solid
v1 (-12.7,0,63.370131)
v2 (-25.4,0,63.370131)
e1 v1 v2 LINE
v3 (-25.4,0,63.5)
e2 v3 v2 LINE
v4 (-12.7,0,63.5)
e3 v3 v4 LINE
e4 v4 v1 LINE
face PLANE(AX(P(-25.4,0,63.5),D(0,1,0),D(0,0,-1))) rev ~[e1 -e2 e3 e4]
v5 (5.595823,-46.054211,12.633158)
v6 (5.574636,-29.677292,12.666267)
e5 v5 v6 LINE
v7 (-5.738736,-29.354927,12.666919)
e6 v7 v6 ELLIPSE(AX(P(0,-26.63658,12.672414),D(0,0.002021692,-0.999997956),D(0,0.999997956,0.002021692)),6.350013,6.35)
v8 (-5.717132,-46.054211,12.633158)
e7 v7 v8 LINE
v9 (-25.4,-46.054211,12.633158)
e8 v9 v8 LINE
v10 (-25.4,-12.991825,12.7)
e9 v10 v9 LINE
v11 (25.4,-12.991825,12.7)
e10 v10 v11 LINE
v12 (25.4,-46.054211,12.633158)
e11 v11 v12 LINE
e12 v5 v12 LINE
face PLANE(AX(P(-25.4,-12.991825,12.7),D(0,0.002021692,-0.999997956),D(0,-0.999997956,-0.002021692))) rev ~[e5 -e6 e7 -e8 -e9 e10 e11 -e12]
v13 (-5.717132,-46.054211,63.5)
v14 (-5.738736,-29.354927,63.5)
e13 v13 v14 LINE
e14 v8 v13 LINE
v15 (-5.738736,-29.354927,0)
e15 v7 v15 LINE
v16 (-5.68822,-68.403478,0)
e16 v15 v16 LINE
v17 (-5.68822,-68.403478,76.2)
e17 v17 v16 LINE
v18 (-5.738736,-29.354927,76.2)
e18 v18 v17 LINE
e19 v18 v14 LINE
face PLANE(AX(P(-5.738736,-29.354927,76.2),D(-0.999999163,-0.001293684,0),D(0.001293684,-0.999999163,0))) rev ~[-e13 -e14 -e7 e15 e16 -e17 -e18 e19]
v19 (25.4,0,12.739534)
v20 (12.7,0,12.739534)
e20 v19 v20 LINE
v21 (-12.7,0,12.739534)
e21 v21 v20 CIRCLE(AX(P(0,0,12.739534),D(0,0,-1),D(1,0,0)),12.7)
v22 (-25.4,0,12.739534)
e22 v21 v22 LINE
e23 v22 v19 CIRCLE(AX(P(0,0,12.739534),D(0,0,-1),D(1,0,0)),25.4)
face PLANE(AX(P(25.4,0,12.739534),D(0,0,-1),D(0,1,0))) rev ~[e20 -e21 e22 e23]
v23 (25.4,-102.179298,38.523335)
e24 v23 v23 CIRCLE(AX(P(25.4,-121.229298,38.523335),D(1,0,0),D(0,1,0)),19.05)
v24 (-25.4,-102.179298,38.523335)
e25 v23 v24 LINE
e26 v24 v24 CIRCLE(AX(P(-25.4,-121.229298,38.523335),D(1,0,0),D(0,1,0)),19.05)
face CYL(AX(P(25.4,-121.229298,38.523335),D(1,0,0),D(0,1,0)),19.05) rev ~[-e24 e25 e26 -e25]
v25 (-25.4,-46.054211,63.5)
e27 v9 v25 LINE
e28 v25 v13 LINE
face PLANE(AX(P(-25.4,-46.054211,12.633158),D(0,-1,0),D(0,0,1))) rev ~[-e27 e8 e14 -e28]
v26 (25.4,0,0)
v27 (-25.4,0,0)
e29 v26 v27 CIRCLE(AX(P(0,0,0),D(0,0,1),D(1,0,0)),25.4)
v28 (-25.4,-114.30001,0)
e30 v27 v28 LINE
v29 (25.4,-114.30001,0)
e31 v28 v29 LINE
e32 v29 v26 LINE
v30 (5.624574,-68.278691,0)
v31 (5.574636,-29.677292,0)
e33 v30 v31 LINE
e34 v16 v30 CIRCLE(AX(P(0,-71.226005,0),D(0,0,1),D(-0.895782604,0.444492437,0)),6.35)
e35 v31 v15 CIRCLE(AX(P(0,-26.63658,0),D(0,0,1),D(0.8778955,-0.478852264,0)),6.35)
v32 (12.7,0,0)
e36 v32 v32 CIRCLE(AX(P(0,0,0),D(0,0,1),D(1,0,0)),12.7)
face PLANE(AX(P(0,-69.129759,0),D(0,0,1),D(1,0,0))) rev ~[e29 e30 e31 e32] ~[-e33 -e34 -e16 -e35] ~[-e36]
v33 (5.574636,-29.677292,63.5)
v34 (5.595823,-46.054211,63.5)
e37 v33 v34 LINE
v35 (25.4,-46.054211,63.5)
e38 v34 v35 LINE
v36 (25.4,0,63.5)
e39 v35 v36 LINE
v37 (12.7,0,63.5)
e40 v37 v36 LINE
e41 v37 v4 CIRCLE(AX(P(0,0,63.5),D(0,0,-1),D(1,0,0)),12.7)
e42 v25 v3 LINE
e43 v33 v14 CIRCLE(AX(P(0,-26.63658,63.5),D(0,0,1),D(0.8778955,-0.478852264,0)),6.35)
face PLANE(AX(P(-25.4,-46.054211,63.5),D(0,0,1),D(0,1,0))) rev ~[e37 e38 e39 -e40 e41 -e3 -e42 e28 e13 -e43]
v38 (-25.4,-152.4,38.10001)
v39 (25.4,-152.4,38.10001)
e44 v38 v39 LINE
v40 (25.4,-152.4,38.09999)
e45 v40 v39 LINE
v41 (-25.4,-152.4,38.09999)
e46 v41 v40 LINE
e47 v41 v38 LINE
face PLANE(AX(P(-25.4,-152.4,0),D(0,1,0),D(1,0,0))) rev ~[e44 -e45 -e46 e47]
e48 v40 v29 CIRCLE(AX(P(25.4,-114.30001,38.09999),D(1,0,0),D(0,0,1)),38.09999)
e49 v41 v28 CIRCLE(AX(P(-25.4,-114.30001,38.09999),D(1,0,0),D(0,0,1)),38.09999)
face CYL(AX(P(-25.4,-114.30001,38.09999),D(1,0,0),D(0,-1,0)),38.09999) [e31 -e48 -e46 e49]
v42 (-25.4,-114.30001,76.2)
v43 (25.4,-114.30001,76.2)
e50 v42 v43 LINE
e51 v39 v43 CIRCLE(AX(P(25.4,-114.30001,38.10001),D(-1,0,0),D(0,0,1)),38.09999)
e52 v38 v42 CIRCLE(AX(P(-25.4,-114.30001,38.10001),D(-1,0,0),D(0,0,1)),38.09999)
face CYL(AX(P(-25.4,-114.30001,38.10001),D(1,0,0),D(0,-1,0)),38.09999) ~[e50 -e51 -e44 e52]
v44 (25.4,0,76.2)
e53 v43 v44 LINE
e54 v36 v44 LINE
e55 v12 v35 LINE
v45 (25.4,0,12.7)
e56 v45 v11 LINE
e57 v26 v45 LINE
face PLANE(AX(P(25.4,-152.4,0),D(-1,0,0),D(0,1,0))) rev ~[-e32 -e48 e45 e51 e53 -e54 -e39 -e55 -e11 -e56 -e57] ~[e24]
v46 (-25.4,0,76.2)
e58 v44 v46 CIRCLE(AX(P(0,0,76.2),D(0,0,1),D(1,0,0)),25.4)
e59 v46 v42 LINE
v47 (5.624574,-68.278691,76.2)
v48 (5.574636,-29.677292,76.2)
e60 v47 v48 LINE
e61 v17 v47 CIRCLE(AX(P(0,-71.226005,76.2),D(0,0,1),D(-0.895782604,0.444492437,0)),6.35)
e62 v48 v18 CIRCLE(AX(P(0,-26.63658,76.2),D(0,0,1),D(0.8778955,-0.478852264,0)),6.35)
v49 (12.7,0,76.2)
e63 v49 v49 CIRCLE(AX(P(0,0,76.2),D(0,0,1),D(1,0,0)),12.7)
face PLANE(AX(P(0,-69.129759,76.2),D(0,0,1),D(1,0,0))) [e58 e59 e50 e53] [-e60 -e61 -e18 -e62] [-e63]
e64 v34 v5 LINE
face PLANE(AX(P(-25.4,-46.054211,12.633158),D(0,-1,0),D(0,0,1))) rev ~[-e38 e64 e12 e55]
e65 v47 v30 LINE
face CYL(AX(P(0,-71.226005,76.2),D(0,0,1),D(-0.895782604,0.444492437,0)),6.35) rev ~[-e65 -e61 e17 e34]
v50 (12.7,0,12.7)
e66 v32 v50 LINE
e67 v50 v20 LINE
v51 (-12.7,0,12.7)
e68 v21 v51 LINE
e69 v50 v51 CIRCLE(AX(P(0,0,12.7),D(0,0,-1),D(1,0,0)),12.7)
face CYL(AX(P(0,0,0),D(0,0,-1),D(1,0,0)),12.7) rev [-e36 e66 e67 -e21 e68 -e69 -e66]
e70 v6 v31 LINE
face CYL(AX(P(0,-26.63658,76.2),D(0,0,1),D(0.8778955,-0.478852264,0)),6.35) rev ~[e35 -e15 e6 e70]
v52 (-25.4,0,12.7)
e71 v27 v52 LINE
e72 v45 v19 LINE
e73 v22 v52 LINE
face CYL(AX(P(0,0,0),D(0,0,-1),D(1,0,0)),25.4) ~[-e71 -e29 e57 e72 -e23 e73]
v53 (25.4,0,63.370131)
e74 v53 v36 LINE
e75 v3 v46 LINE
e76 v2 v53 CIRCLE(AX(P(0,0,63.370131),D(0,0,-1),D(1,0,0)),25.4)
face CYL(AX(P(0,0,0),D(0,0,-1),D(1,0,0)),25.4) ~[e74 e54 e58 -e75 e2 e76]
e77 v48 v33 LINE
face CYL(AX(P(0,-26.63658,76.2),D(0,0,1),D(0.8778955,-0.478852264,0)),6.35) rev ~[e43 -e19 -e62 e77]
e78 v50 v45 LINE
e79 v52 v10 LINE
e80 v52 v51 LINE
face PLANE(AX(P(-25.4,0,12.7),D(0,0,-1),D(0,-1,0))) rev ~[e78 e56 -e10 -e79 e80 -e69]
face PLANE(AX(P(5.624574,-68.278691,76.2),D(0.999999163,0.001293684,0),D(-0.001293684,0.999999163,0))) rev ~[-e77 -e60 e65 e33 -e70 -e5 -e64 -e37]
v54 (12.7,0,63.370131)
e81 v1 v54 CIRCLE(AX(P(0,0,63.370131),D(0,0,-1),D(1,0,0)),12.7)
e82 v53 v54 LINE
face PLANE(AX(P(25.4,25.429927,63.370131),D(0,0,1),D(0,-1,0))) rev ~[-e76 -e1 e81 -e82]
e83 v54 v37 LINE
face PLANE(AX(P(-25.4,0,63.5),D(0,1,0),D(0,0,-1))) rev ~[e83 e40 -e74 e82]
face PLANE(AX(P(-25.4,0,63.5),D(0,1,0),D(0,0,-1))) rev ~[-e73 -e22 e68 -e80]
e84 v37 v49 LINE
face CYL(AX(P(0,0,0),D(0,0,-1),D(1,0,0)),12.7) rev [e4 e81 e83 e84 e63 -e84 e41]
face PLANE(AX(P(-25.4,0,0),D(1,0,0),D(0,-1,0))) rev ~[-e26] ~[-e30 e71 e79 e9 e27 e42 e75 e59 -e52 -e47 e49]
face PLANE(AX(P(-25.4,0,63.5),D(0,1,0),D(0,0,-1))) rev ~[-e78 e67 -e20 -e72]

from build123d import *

# Parameters (mm, degrees)
F0_R      = 12.7
F1_DEPTH  = 76.2
F2_R      = 38.09999
F3_R      = 19.05
F4_DEPTH  = 50.801
F6_DEPTH  = 76.201
F8_DEPTH  = 50.801
F11_DEPTH = 50.801


# Not quite as in the source:
# - a fillet or chamfer is up to 0.001 mm smaller than in the source, because OpenCascade refuses the exact size


with BuildPart() as f1:
    # F0 (on Top) → F1 (new body)
    with BuildSketch(Plane.XY):
        with BuildLine():
            Line((25.4, -152.4), (25.4, 0))
            ThreePointArc((25.4, 0), (0, 25.4), (-25.4, 0))
            Line((-25.4, 0), (-25.4, -152.4))
            Line((-25.4, -152.4), (25.4, -152.4))
        make_face()
        Circle(F0_R, mode=Mode.SUBTRACT)
    extrude(amount=F1_DEPTH)

    # F2 (radius 38.1 in the source; OpenCascade refuses exactly that, so slightly less here)
    f2_edges = [f1.edges().sort_by_distance(p)[0] for p in [
        (0, -152.4, 76.2),
        (0, -152.4, 0),
    ]]
    fillet(f2_edges, radius=F2_R)

    # F3 (on face) → F4 (cut, through all)
    with BuildSketch(Plane.YZ.offset(25.4)):
        with Locations((-121.2292984128, 38.5233350098)):
            Circle(F3_R)
    extrude(amount=-F4_DEPTH, mode=Mode.SUBTRACT)

    # F5 (on face) → F6 (cut, through all)
    with BuildSketch(Plane.XY.offset(76.2)):
        with BuildLine():
            Line((-5.7387360482, -29.3549266663), (-5.6882195357, -68.4034783226))
            ThreePointArc((-5.6882195357, -68.4034783226), (0.0700403354, -77.5756190124), (5.6245744634, -68.2786909069))
            Line((5.6245744634, -68.2786909069), (5.5746364254, -29.6772918832))
            ThreePointArc((5.5746364254, -29.6772918832), (0.1808646036, -20.2891562763), (-5.7387360482, -29.3549266663))
        make_face()
    extrude(amount=-F6_DEPTH, mode=Mode.SUBTRACT)

    # F7 (on face) → F8 (cut, through all)
    with BuildSketch(Plane(origin=(-25.4, 0, 0), x_dir=(0, -1, 0), z_dir=(-1, 0, 0))):
        Polygon((0, 63.5), (0, 12.7), (12.9918251187, 12.7), (46.0542105138, 12.633157894), (46.0542105138, 63.5), (12.9918251187, 63.5), align=None)
    extrude(amount=-F8_DEPTH, mode=Mode.SUBTRACT)

    # F10 (on offset) → F11 (cut, through all)
    with BuildSketch(Plane.YZ.offset(25.4)):
        Polygon((25.4299268126, 63.3701309562), (0, 63.3701309562), (0, 12.7395335585), (25.4423227161, 12.7395335585), align=None)
    extrude(amount=-F11_DEPTH, mode=Mode.SUBTRACT)


solid = f1.part
